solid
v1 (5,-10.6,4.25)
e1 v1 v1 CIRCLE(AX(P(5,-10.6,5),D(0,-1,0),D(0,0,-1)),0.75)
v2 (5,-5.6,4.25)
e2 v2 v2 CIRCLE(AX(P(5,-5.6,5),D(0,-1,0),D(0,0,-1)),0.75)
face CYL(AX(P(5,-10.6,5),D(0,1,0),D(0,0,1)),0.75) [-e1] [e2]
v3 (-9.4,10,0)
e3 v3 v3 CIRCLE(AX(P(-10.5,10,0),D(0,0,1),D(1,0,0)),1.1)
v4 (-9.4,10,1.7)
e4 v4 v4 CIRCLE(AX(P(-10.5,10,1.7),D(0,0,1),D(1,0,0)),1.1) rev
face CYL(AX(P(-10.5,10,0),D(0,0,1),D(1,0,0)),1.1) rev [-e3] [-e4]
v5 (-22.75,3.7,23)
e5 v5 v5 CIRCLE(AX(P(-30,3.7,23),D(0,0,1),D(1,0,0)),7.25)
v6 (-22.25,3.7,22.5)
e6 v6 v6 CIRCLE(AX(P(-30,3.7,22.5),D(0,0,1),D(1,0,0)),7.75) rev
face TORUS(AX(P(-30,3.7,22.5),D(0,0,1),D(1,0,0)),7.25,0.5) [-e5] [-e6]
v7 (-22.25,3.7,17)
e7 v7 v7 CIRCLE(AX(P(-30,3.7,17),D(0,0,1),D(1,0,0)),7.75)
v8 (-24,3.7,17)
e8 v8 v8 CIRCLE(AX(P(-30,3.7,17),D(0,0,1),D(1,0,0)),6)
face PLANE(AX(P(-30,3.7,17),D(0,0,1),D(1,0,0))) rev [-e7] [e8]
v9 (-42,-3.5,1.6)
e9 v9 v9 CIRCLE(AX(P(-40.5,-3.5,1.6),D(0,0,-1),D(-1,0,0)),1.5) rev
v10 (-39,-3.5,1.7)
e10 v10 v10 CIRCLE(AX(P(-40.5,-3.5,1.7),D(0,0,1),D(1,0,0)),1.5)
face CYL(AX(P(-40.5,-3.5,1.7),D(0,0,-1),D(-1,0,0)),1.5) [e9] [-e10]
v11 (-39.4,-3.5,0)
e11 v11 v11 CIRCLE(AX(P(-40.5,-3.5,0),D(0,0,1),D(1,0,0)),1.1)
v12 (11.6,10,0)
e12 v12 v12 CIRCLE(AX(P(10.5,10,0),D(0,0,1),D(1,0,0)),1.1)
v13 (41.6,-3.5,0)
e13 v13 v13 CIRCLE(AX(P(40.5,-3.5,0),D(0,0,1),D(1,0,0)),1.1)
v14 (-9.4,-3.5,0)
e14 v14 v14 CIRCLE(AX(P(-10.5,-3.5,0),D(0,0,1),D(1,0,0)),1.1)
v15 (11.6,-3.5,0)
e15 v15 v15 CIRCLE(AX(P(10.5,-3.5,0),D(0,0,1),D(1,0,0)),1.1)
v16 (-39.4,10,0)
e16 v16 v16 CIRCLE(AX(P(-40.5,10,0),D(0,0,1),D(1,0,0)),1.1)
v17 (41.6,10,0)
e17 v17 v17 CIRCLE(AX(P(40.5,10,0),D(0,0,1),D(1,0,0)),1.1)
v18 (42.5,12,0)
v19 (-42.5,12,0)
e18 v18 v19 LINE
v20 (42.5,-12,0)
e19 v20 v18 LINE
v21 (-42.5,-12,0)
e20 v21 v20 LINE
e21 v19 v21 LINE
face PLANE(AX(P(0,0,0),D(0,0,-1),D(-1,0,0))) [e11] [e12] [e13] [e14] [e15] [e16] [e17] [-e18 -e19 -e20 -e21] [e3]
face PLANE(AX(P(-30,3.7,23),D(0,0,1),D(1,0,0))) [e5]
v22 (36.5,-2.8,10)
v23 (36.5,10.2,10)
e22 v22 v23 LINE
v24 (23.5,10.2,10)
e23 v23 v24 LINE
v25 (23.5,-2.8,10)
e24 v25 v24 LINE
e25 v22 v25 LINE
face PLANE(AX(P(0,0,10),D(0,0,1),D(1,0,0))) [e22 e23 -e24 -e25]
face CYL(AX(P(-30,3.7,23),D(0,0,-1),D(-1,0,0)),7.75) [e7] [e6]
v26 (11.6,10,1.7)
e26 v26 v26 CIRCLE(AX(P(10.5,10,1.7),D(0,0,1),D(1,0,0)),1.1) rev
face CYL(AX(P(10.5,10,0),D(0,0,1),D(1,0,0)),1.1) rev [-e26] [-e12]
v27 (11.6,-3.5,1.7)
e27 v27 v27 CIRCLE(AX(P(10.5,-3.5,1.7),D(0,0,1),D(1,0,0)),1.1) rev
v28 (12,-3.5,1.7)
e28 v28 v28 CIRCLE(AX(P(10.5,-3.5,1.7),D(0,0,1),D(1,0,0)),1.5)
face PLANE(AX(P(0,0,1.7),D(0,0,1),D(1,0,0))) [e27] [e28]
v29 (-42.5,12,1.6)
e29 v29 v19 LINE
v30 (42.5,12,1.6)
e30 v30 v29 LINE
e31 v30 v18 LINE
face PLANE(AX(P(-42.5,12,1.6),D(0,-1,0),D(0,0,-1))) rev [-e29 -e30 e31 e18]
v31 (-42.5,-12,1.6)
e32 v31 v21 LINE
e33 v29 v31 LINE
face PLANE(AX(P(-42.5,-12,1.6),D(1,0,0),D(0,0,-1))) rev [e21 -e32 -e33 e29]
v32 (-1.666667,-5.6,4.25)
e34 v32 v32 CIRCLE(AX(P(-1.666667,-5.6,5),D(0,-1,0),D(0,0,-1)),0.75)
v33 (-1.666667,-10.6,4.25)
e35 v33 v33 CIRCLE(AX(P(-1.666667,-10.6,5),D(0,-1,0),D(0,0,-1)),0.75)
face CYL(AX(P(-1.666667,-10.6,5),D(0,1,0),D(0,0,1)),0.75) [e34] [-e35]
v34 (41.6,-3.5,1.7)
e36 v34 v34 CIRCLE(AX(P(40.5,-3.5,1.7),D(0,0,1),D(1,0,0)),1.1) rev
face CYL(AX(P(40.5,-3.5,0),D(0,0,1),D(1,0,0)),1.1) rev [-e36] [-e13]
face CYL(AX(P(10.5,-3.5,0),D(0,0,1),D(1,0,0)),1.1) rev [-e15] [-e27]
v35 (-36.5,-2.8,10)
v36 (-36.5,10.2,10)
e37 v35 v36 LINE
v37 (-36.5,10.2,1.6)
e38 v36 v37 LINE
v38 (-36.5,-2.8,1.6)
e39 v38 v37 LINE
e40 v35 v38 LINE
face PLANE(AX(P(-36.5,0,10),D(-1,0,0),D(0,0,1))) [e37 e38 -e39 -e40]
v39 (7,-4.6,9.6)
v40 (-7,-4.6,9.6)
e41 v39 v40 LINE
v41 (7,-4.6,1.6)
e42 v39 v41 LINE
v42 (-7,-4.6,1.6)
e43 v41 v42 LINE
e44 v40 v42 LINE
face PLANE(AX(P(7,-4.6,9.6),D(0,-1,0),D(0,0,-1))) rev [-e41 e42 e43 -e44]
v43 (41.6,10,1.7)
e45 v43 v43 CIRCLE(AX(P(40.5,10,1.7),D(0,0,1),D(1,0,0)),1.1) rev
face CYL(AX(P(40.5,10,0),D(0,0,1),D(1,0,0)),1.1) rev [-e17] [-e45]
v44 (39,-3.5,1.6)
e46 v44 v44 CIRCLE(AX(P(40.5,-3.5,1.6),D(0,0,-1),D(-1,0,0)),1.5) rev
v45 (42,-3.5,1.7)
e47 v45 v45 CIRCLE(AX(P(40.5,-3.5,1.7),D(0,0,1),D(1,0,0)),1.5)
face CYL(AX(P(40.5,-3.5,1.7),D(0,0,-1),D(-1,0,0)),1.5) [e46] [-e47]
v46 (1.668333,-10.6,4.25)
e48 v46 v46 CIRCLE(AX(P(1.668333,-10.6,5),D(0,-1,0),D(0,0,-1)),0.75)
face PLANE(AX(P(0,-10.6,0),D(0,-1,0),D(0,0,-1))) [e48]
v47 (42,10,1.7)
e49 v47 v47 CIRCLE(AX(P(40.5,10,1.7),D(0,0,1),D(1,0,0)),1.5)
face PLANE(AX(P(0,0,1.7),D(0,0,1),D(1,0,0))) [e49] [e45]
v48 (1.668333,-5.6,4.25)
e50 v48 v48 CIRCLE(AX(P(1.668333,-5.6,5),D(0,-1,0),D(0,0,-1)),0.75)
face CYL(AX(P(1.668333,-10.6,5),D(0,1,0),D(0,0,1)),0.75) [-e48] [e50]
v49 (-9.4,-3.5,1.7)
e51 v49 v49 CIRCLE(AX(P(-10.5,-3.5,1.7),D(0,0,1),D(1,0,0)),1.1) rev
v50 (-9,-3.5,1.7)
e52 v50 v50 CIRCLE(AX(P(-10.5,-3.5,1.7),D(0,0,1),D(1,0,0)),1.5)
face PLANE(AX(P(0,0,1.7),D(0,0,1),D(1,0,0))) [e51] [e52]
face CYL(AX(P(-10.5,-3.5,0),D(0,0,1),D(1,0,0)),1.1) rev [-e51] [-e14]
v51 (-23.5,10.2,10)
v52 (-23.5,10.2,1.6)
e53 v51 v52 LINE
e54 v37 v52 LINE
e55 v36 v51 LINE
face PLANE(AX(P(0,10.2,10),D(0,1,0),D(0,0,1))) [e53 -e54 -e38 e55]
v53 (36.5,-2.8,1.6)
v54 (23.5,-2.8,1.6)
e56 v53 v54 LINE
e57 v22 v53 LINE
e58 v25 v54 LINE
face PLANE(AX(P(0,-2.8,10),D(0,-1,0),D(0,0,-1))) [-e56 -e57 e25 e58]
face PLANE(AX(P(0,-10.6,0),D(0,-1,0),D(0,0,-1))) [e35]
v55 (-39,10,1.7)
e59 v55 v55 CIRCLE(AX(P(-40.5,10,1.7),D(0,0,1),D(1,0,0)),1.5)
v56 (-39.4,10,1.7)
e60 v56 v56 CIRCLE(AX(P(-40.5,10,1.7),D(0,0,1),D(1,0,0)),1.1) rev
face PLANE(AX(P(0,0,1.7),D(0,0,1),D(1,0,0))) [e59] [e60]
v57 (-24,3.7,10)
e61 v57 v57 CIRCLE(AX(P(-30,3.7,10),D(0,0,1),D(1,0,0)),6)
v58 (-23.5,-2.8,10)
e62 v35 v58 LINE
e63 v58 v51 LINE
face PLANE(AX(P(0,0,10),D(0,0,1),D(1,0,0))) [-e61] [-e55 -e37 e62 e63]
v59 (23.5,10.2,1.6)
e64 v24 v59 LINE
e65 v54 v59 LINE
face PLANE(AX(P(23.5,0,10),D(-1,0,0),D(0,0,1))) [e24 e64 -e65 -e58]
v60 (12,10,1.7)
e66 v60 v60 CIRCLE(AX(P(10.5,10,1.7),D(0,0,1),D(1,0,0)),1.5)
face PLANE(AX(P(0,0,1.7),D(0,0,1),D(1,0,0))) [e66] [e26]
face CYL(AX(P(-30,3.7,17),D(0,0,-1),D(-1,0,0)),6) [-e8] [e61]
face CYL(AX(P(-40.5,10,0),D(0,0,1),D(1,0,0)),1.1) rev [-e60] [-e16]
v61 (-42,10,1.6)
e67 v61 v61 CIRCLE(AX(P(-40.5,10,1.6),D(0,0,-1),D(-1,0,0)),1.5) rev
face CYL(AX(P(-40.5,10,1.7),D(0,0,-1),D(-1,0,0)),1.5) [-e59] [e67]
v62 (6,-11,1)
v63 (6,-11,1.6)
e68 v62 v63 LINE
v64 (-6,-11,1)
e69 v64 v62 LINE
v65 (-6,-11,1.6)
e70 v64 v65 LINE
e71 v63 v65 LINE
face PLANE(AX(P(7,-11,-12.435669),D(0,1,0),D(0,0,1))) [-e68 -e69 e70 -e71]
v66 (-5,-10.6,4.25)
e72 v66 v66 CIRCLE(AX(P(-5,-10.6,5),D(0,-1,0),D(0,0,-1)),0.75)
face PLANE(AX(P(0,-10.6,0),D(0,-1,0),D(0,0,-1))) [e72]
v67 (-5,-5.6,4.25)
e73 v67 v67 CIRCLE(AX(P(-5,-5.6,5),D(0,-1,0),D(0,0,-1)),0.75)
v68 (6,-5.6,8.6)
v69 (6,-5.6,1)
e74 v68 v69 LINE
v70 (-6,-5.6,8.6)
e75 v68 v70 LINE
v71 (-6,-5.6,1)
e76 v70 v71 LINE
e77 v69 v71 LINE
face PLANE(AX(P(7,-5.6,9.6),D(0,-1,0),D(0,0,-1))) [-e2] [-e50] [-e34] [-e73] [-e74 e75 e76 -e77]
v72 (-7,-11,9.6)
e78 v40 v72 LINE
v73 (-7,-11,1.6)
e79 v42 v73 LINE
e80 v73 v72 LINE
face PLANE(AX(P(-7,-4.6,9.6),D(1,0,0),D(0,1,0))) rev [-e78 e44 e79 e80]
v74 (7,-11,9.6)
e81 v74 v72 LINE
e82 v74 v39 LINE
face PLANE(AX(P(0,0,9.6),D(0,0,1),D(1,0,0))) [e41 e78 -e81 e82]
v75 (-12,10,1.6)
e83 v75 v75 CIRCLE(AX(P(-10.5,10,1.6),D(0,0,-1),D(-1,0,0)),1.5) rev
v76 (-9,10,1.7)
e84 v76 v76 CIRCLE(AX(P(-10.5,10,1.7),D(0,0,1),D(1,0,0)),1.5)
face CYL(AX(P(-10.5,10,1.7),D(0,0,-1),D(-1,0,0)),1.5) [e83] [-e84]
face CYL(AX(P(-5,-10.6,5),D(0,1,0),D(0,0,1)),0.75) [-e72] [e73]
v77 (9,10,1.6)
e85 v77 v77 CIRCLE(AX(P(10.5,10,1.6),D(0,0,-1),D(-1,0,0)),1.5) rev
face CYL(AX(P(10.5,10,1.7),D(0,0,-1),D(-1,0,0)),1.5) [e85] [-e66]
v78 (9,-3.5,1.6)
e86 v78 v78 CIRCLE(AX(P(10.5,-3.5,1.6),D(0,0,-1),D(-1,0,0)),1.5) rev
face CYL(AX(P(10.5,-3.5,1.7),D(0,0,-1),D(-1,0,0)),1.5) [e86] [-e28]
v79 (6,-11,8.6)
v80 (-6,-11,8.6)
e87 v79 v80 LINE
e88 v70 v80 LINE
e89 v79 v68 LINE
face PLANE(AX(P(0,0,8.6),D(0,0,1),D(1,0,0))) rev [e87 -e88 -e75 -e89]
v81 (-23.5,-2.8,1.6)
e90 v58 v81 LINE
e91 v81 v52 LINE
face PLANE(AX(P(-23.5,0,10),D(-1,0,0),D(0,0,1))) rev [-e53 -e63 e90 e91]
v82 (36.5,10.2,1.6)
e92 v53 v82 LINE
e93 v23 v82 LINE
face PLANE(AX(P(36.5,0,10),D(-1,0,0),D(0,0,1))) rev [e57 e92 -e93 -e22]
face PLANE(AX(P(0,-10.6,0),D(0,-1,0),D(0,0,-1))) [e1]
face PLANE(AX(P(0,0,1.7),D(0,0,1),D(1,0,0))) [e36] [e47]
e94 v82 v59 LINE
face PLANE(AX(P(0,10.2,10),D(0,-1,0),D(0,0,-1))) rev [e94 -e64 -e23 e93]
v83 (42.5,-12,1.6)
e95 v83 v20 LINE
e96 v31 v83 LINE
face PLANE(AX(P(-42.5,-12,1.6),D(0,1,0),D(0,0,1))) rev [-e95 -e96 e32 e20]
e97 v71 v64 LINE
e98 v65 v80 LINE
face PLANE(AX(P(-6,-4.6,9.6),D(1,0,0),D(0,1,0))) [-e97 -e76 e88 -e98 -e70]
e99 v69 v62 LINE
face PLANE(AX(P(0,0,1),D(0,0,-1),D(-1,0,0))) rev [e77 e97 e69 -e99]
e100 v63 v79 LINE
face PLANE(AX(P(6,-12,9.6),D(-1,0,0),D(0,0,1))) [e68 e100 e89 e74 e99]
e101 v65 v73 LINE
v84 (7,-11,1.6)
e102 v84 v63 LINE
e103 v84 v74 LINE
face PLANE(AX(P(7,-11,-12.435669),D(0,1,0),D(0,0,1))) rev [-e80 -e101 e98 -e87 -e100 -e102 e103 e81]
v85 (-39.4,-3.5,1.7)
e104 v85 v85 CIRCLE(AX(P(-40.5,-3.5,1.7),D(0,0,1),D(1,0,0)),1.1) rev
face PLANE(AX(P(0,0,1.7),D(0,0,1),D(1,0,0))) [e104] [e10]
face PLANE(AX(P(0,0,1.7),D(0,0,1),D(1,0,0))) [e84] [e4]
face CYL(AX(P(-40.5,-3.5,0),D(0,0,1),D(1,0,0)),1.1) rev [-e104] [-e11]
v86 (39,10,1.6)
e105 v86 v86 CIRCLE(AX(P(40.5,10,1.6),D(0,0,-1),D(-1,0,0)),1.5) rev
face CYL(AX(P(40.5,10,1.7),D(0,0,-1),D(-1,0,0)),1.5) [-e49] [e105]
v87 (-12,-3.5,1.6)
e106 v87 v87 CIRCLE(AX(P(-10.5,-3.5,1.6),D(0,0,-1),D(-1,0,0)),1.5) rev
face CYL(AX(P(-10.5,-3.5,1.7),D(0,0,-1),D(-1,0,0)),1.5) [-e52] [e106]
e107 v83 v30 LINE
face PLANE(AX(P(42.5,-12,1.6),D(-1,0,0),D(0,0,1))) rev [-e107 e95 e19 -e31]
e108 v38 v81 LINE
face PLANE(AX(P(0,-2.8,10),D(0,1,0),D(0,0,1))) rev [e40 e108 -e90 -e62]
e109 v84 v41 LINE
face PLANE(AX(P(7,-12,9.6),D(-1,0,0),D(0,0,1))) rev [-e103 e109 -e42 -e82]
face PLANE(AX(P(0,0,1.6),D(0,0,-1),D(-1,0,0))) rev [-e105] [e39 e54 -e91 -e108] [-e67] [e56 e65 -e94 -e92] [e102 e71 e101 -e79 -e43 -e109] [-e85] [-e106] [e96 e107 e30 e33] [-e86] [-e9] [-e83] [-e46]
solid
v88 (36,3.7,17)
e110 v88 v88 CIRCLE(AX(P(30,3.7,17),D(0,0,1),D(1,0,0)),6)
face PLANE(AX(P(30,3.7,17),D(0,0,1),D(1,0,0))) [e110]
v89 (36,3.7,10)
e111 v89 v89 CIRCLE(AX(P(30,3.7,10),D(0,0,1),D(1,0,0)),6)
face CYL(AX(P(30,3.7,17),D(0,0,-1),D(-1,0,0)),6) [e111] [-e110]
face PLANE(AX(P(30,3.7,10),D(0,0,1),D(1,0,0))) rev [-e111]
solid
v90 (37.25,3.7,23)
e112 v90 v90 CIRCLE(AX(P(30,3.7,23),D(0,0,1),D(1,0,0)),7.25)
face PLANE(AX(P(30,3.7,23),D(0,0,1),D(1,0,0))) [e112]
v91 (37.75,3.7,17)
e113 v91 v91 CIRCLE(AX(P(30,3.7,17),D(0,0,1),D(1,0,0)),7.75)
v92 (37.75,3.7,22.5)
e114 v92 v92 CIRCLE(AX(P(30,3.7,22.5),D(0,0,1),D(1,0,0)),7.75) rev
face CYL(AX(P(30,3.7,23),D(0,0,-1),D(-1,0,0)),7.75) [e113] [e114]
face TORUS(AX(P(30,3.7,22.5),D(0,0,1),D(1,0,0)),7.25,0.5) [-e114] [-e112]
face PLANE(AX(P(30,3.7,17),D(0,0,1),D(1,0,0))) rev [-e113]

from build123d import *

# Parameters (mm, degrees)
SKETCH4_W            = 85
SKETCH4_H            = 24
BOSS_EXTRUDE4_DEPTH  = 1.6
SKETCH5_R            = 1.1
CUT_EXTRUDE1_DEPTH   = 1.6
SKETCH6_W            = 13
SKETCH6_H            = 13
BOSS_EXTRUDE5_DEPTH  = 8.4
SKETCH7_R            = 6
BOSS_EXTRUDE6_DEPTH  = 7
SKETCH8_R            = 7.75
BOSS_EXTRUDE7_DEPTH  = 6
SKETCH9_R            = 6
BOSS_EXTRUDE8_DEPTH  = 7
SKETCH10_R           = 7.75
BOSS_EXTRUDE9_DEPTH  = 6
BOSS_EXTRUDE10_DEPTH = 8
SKETCH12_W           = 14
SKETCH12_H           = 1
CUT_EXTRUDE2_DEPTH   = 8
SHELL1_START         = 1
SHELL1_OUTLINE_W     = 12
SHELL1_OUTLINE_H     = 5.4
SHELL1_DEPTH         = 7.6
SKETCH14_R           = 0.75
BOSS_EXTRUDE11_DEPTH = 5
FILLET1_R            = 0.5
FILLET2_R            = 0.5
BOSS_EXTRUDE12_START = 0.1
SKETCH15_R           = 1.5
SKETCH15_R_2         = 1.1
BOSS_EXTRUDE12_DEPTH = 0.1


# Read off the part's stored shape, not the designer's step: Shell1
with BuildPart() as part:
    # Sketch4 → Boss-Extrude4 (new body)
    with BuildSketch(Plane.XY):
        Rectangle(SKETCH4_W, SKETCH4_H)
    extrude(amount=BOSS_EXTRUDE4_DEPTH)

    # Sketch5 → Cut-Extrude1 (cut)
    with BuildSketch(Plane.XY.offset(1.6)):
        with Locations((-40.5, 10)):
            Circle(SKETCH5_R)
        with Locations((-40.5, -3.5)):
            Circle(SKETCH5_R)
        with Locations((-10.5, -3.5)):
            Circle(SKETCH5_R)
        with Locations((-10.5, 10)):
            Circle(SKETCH5_R)
        with Locations((10.5, 10)):
            Circle(SKETCH5_R)
        with Locations((10.5, -3.5)):
            Circle(SKETCH5_R)
        with Locations((40.5, 10)):
            Circle(SKETCH5_R)
        with Locations((40.5, -3.5)):
            Circle(SKETCH5_R)
    extrude(amount=-CUT_EXTRUDE1_DEPTH, mode=Mode.SUBTRACT)

    # Sketch6 → Boss-Extrude5 (add)
    with BuildSketch(Plane.XY.offset(1.6)):
        with Locations((-30, 3.7)):
            Rectangle(SKETCH6_W, SKETCH6_H)
        with Locations((30, 3.7)):
            Rectangle(SKETCH6_W, SKETCH6_H)
    extrude(amount=BOSS_EXTRUDE5_DEPTH)

    # Sketch7 → Boss-Extrude6 (add)
    with BuildSketch(Plane.XY.offset(10)):
        with Locations((-30, 3.7)):
            Circle(SKETCH7_R)
    extrude(amount=BOSS_EXTRUDE6_DEPTH)

    # Sketch8 → Boss-Extrude7 (add)
    with BuildSketch(Plane.XY.offset(17)):
        with Locations((-30, 3.7)):
            Circle(SKETCH8_R)
    extrude(amount=BOSS_EXTRUDE7_DEPTH)

    # Sketch11 → Boss-Extrude10 (add)
    with BuildSketch(Plane.XY.offset(1.6)):
        Polygon((0, -12), (7, -12), (7, -4.6), (-7, -4.6), (-7, -12), align=None)
    extrude(amount=BOSS_EXTRUDE10_DEPTH)

    # Sketch12 → Cut-Extrude2 (cut)
    with BuildSketch(Plane.XY.offset(9.6)):
        with Locations((0, -11.5)):
            Rectangle(SKETCH12_W, SKETCH12_H)
    extrude(amount=-CUT_EXTRUDE2_DEPTH, mode=Mode.SUBTRACT)

    # Shell1 outline → Shell1 (cut)
    with BuildSketch(Plane.XY.offset(SHELL1_START)):
        with Locations((0, -8.3)):
            Rectangle(SHELL1_OUTLINE_W, SHELL1_OUTLINE_H)
    extrude(amount=SHELL1_DEPTH, mode=Mode.SUBTRACT)

    # Sketch14 → Boss-Extrude11 (add)
    with BuildSketch(Plane(origin=(0, -5.6, 0), x_dir=(-1, 0, 0), z_dir=(0, -1, 0))):
        with Locations(Location((5, -5, 0), (0, 0, 90))):
            Circle(SKETCH14_R)
        with Locations(Location((-5, -5, 0), (0, 0, 90))):
            Circle(SKETCH14_R)
        with Locations(Location((1.666666667, -5, 0), (0, 0, 90))):
            Circle(SKETCH14_R)
        with Locations(Location((-1.668333333, -5, 0), (0, 0, 90))):
            Circle(SKETCH14_R)
    extrude(amount=BOSS_EXTRUDE11_DEPTH)

    # Fillet1
    fillet1_edges = [part.edges().sort_by_distance(p)[0] for p in [
        (-37.75, 3.7, 23),
    ]]
    fillet(fillet1_edges, radius=FILLET1_R)

    # Sketch15 → Boss-Extrude12 (add)
    # profile 1 of 8: a face of its own
    with BuildSketch(Plane.XY.offset(1.6).offset(BOSS_EXTRUDE12_START)):
        with Locations(Location((-10.5, 10, 0), (0, 0, 180))):
            Circle(SKETCH15_R)
        with Locations((-10.5, 10)):
            Circle(SKETCH15_R_2, mode=Mode.SUBTRACT)
    # profile 2 of 8: a face of its own
    with BuildSketch(Plane.XY.offset(1.6).offset(BOSS_EXTRUDE12_START)):
        with Locations(Location((-10.5, -3.5, 0), (0, 0, 180))):
            Circle(SKETCH15_R)
        with Locations((-10.5, -3.5)):
            Circle(SKETCH15_R_2, mode=Mode.SUBTRACT)
    # profile 3 of 8: a face of its own
    with BuildSketch(Plane.XY.offset(1.6).offset(BOSS_EXTRUDE12_START)):
        with Locations(Location((-40.5, 10, 0), (0, 0, 180))):
            Circle(SKETCH15_R)
        with Locations((-40.5, 10)):
            Circle(SKETCH15_R_2, mode=Mode.SUBTRACT)
    # profile 4 of 8: a face of its own
    with BuildSketch(Plane.XY.offset(1.6).offset(BOSS_EXTRUDE12_START)):
        with Locations(Location((-40.5, -3.5, 0), (0, 0, 180))):
            Circle(SKETCH15_R)
        with Locations((-40.5, -3.5)):
            Circle(SKETCH15_R_2, mode=Mode.SUBTRACT)
    # profile 5 of 8: a face of its own
    with BuildSketch(Plane.XY.offset(1.6).offset(BOSS_EXTRUDE12_START)):
        with Locations(Location((10.5, 10, 0), (0, 0, 180))):
            Circle(SKETCH15_R)
        with Locations((10.5, 10)):
            Circle(SKETCH15_R_2, mode=Mode.SUBTRACT)
    # profile 6 of 8: a face of its own
    with BuildSketch(Plane.XY.offset(1.6).offset(BOSS_EXTRUDE12_START)):
        with Locations(Location((10.5, -3.5, 0), (0, 0, 180))):
            Circle(SKETCH15_R)
        with Locations((10.5, -3.5)):
            Circle(SKETCH15_R_2, mode=Mode.SUBTRACT)
    # profile 7 of 8: a face of its own
    with BuildSketch(Plane.XY.offset(1.6).offset(BOSS_EXTRUDE12_START)):
        with Locations(Location((40.5, 10, 0), (0, 0, 180))):
            Circle(SKETCH15_R)
        with Locations((40.5, 10)):
            Circle(SKETCH15_R_2, mode=Mode.SUBTRACT)
    # profile 8 of 8: a face of its own
    with BuildSketch(Plane.XY.offset(1.6).offset(BOSS_EXTRUDE12_START)):
        with Locations(Location((40.5, -3.5, 0), (0, 0, 180))):
            Circle(SKETCH15_R)
        with Locations((40.5, -3.5)):
            Circle(SKETCH15_R_2, mode=Mode.SUBTRACT)
    extrude(amount=-BOSS_EXTRUDE12_DEPTH)


with BuildPart() as body_2:
    # Sketch9 → Boss-Extrude8 (new body)
    with BuildSketch(Plane.XY.offset(10)):
        with Locations((30, 3.7)):
            Circle(SKETCH9_R)
    extrude(amount=BOSS_EXTRUDE8_DEPTH)


with BuildPart() as body_3:
    # Sketch10 → Boss-Extrude9 (new body)
    with BuildSketch(Plane.XY.offset(17)):
        with Locations((30, 3.7)):
            Circle(SKETCH10_R)
    extrude(amount=BOSS_EXTRUDE9_DEPTH)

    # Fillet2
    fillet2_edges = [body_3.edges().sort_by_distance(p)[0] for p in [
        (22.25, 3.7, 23),
    ]]
    fillet(fillet2_edges, radius=FILLET2_R)


solid = Compound([part.part, body_2.part, body_3.part])
